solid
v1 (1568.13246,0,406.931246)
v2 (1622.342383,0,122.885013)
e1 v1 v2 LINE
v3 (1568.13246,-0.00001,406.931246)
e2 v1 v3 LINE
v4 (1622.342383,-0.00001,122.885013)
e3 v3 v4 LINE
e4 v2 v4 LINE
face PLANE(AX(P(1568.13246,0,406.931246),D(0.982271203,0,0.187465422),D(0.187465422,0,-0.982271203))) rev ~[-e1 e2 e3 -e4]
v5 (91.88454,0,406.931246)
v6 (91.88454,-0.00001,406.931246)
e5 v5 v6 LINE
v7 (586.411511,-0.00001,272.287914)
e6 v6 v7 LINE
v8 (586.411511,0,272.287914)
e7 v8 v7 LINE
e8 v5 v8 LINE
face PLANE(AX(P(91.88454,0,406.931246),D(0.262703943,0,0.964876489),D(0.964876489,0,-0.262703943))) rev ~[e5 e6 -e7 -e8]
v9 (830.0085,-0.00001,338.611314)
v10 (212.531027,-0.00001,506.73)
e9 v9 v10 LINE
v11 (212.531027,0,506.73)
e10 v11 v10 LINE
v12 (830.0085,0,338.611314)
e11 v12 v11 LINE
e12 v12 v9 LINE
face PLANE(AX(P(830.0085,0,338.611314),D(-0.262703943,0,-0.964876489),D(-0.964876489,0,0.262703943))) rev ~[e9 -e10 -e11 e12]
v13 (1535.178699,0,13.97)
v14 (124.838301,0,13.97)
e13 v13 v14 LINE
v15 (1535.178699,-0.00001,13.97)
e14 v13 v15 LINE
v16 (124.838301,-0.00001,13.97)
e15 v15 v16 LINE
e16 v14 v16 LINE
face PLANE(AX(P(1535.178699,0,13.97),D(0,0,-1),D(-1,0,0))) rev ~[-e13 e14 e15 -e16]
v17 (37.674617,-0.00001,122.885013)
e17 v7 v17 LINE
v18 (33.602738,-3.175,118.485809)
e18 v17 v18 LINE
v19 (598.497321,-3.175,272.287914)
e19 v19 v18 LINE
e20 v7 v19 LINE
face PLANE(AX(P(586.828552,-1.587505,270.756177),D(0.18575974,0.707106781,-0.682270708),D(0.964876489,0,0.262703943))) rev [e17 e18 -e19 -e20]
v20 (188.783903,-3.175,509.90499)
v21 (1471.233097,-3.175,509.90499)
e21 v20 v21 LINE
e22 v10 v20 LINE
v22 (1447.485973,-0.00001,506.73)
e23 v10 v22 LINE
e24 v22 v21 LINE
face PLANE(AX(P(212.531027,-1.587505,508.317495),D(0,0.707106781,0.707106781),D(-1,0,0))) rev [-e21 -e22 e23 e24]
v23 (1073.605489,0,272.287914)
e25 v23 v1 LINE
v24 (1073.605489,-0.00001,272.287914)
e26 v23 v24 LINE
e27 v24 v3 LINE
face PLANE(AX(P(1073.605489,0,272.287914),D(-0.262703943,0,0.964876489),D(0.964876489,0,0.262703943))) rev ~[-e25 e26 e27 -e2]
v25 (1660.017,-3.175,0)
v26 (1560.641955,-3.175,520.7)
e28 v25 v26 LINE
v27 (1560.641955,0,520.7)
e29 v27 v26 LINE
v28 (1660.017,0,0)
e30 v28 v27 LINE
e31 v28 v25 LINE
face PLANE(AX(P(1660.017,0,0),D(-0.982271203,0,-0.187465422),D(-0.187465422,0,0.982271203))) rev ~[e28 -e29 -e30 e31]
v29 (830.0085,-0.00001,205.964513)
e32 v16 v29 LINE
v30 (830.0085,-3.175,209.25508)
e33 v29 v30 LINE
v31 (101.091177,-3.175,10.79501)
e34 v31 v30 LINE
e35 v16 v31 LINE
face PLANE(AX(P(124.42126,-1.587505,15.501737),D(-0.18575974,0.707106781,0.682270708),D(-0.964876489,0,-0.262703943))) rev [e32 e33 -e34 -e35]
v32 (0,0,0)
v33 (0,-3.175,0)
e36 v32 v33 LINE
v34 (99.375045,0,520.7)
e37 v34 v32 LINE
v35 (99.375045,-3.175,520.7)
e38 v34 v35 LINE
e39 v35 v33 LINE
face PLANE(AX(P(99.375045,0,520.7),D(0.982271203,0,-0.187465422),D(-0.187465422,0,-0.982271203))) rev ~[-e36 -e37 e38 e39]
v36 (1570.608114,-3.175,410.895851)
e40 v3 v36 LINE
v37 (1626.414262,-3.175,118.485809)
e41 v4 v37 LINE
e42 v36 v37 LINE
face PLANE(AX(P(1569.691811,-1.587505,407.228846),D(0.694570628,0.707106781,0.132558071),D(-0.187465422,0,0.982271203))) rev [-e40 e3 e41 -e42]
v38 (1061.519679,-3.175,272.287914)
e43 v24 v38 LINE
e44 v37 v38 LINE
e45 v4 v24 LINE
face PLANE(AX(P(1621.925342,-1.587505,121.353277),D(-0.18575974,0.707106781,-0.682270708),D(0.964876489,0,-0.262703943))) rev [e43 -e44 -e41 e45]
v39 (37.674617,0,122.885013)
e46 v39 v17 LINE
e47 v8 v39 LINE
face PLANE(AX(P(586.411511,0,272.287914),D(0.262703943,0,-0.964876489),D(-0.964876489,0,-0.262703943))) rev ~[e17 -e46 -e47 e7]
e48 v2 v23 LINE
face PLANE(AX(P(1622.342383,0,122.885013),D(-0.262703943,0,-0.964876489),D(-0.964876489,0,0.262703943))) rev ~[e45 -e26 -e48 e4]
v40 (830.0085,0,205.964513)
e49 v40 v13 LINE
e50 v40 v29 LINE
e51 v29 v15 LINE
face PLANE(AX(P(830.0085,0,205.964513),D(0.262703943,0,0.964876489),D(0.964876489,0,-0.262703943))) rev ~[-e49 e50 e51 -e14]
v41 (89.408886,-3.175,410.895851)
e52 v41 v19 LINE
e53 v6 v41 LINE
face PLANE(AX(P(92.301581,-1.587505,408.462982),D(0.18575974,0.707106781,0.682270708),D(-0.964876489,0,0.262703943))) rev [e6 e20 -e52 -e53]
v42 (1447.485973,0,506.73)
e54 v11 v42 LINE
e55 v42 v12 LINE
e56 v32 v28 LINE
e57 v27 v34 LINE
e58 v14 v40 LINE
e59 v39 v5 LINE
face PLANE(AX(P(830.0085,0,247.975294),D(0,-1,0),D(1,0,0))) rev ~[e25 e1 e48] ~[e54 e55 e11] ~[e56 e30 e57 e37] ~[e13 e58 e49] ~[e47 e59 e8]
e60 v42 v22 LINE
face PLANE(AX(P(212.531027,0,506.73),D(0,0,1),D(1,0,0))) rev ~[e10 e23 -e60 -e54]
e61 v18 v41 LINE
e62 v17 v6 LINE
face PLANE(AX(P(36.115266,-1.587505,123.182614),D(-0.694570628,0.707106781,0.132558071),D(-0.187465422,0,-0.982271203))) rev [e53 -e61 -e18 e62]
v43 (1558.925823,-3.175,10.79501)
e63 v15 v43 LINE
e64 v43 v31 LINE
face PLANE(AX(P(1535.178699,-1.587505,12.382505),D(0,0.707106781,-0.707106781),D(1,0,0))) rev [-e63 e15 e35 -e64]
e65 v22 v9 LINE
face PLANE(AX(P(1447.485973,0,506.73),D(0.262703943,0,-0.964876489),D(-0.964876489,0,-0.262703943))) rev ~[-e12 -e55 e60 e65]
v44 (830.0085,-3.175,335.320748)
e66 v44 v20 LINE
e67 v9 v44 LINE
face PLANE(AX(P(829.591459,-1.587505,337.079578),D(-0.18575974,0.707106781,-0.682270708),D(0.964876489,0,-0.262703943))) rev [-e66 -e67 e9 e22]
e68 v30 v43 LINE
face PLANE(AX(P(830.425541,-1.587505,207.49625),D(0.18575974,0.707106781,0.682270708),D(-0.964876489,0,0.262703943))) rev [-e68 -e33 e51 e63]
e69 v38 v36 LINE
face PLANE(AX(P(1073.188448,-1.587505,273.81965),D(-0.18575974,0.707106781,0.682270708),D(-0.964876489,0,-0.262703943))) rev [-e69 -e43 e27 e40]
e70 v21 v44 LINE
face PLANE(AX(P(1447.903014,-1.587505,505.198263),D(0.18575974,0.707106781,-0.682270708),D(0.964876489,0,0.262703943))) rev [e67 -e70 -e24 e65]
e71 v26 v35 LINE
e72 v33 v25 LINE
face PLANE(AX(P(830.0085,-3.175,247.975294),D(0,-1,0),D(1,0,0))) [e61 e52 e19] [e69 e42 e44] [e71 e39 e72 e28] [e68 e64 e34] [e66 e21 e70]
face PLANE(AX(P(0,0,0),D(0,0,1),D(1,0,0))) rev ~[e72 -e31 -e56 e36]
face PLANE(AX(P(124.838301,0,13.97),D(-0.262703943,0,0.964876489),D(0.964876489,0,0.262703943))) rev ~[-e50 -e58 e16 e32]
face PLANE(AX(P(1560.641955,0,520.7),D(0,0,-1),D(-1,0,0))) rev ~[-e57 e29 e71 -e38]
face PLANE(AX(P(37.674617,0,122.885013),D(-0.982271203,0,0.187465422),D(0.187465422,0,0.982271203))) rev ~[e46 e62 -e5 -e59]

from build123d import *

# Parameters (mm, degrees)
F1_DEPTH = 3.175
F2_SIZE  = 3.17499


# Not quite as in the source:
# - a fillet or chamfer is up to 0.001 mm smaller than in the source, because OpenCascade refuses the exact size


with BuildPart() as f1:
    # F0 (on Front) → F1 (new body)
    with BuildSketch(Plane.XZ):
        Polygon((99.3750451773, 520.7), (0, 0), (1660.017, 0), (1560.6419548227, 520.7), align=None)
        Polygon((1535.1786987879, 13.97), (124.8383012121, 13.97), (830.0085, 205.9645134825), align=None, mode=Mode.SUBTRACT)
        Polygon((37.6746165108, 122.8850133893), (91.8845400349, 406.9312458074), (586.4115107328, 272.2879138766), align=None, mode=Mode.SUBTRACT)
        Polygon((1568.1324599651, 406.9312458074), (1622.3423834892, 122.8850133893), (1073.6054892672, 272.2879138766), align=None, mode=Mode.SUBTRACT)
        Polygon((830.0085, 338.6113142706), (212.5310268921, 506.73), (1447.4859731079, 506.73), align=None, mode=Mode.SUBTRACT)
    extrude(amount=F1_DEPTH)

    # F2 (size 3.175 in the source; OpenCascade refuses exactly that, so slightly less here)
    f2_edges = [f1.edges().sort_by_distance(p)[0] for p in [
        (64.779578, -3.175, 264.90813),
        (312.043064, -3.175, 197.586464),
        (339.148025, -3.175, 339.60958),
        (521.269763, -3.175, 422.670657),
        (830.0085, -3.175, 506.73),
        (1138.747237, -3.175, 422.670657),
        (1320.868975, -3.175, 339.60958),
        (1347.973936, -3.175, 197.586464),
        (1595.237422, -3.175, 264.90813),
        (830.0085, -3.175, 13.97),
        (1182.593599, -3.175, 109.967257),
        (477.423401, -3.175, 109.967257),
    ]]
    chamfer(f2_edges, length=F2_SIZE)


solid = f1.part
